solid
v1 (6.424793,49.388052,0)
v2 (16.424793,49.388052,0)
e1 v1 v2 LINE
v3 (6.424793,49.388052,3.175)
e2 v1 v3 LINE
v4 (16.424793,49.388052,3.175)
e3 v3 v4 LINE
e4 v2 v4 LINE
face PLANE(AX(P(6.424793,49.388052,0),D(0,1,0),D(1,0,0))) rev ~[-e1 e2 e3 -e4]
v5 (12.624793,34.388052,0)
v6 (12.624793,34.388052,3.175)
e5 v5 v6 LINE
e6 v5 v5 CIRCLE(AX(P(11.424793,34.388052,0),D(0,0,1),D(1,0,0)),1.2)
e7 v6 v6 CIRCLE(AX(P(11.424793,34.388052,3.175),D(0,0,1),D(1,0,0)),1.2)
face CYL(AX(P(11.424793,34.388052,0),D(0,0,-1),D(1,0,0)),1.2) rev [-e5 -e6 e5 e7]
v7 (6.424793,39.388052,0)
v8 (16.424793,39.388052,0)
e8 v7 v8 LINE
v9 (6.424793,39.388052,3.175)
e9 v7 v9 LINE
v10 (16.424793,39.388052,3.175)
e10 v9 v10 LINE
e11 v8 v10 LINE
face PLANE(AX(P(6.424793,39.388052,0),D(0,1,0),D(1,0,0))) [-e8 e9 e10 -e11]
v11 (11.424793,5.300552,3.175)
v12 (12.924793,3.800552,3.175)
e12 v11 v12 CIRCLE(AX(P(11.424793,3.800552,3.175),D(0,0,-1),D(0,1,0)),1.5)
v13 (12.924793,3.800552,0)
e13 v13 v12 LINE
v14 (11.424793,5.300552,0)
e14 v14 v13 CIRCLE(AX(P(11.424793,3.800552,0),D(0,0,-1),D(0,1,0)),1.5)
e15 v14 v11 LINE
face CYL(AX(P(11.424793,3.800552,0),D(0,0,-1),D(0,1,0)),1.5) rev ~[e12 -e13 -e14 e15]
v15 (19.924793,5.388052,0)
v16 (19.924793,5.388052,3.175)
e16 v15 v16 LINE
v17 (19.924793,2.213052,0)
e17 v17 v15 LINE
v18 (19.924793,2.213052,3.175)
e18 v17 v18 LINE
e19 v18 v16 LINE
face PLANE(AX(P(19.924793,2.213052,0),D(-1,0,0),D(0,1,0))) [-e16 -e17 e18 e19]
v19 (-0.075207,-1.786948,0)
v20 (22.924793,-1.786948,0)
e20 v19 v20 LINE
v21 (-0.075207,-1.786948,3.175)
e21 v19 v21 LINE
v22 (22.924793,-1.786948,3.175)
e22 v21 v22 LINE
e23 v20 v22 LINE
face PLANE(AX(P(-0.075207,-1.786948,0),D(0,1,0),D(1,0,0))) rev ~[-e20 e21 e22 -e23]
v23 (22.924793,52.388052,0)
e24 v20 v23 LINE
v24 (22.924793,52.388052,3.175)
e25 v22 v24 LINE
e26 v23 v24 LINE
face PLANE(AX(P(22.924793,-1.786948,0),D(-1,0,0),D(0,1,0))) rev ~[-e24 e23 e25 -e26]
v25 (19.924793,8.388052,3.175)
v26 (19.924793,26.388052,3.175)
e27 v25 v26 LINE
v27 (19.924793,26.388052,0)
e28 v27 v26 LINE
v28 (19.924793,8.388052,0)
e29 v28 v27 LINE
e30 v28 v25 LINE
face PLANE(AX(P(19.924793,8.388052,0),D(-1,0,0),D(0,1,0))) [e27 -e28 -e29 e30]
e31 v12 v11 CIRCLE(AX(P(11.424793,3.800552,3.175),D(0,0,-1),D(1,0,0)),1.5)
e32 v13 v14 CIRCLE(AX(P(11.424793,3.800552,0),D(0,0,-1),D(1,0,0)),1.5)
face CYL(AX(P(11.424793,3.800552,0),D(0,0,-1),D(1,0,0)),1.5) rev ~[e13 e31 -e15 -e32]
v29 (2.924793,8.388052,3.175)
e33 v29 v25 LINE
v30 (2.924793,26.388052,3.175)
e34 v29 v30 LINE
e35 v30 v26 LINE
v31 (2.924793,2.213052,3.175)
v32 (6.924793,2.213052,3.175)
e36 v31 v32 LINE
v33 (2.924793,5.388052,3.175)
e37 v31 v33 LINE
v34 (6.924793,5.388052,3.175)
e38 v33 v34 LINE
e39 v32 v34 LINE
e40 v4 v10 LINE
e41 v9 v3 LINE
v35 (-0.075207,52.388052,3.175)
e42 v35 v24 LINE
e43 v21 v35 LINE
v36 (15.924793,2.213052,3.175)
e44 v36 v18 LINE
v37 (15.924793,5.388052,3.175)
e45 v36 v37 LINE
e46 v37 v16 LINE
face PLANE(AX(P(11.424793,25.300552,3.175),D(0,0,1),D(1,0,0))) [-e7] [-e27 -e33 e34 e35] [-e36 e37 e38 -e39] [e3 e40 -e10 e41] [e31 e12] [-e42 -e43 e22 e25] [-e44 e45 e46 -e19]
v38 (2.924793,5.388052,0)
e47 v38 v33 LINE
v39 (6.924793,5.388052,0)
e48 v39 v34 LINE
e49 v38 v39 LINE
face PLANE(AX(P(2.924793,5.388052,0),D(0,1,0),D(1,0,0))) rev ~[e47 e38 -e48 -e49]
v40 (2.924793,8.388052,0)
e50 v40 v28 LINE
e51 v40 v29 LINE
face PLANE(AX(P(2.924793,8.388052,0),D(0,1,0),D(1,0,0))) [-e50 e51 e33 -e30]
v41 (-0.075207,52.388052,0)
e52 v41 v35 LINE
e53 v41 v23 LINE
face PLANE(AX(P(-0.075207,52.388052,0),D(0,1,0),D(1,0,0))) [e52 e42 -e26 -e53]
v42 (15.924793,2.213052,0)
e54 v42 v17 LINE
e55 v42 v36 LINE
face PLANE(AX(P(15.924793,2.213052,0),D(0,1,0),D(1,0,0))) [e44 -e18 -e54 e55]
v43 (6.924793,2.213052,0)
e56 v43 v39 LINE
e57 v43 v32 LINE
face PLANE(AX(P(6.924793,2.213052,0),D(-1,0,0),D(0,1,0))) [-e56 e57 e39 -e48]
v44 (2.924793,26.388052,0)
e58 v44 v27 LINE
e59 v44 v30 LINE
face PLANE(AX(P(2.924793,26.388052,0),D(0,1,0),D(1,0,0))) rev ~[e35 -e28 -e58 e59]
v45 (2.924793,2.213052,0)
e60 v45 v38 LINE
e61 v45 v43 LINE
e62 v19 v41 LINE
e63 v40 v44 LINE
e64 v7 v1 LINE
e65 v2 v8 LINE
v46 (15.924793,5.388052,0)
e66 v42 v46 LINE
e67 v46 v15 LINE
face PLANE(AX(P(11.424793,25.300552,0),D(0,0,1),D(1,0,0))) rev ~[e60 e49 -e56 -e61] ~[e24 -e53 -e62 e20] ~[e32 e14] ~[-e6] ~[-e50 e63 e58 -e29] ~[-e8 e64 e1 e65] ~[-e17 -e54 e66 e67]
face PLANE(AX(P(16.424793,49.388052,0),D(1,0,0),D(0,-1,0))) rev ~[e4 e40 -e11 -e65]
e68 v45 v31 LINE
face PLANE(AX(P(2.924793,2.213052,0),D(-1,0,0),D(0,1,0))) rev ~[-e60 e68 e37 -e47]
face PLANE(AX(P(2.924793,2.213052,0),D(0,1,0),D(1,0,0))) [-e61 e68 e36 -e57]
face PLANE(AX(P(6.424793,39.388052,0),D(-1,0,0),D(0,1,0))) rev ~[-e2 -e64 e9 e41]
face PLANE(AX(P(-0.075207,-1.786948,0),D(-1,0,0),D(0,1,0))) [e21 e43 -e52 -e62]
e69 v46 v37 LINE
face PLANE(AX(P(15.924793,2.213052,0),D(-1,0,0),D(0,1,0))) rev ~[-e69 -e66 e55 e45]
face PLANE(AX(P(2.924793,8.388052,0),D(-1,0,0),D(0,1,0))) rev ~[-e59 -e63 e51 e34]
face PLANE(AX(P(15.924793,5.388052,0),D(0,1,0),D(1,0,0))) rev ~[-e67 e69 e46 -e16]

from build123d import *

# Parameters (mm, degrees)
F0_W     = 23
F0_H     = 54.175
F0_W_2   = 4
F0_H_2   = 3.175
F0_W_3   = 17
F0_H_3   = 18
F0_W_4   = 10
F0_H_4   = 10
F0_R     = 1.2
F1_DEPTH = 3.175


# Not quite as in the source:
# - a length typed as a fraction of an inch, garbled in the dataset ("3 / 203.2 mm" for 3/8 in), is restored
# - a feature names something its author has since deleted; it is built from what else it names


with BuildPart() as f1:
    # F0 (on Top) → F1 (new body)
    with BuildSketch(Plane.XY):
        with Locations((11.4247928681, 25.3005515426)):
            Rectangle(F0_W, F0_H)
        with Locations((4.9247928681, 3.8005515426)):
            Rectangle(F0_W_2, F0_H_2, mode=Mode.SUBTRACT)
        with BuildLine():
            ThreePointArc((11.4247928681, 5.3005515426), (12.4854530398, 4.8612117144), (12.9247928681, 3.8005515426))
            ThreePointArc((12.9247928681, 3.8005515426), (10.3641326963, 2.7398913709), (11.4247928681, 5.3005515426))
        make_face(mode=Mode.SUBTRACT)
        with Locations((17.9247928681, 3.8005515426)):
            Rectangle(F0_W_2, F0_H_2, mode=Mode.SUBTRACT)
        with Locations((11.4247928681, 17.3880515426)):
            Rectangle(F0_W_3, F0_H_3, mode=Mode.SUBTRACT)
        Polygon((6.4247928681, 29.3880515426), (6.4247928681, 39.3880515426), (6.4247928681, 49.3880515426), (16.4247928681, 49.3880515426), (16.4247928681, 39.3880515426), (16.4247928681, 29.3880515426), align=None, mode=Mode.SUBTRACT)
        with Locations((11.4247928681, 34.3880515426)):
            Rectangle(F0_W_4, F0_H_4)
        with Locations((11.4247928681, 34.3880515426)):
            Circle(F0_R, mode=Mode.SUBTRACT)
    extrude(amount=F1_DEPTH)


solid = f1.part
